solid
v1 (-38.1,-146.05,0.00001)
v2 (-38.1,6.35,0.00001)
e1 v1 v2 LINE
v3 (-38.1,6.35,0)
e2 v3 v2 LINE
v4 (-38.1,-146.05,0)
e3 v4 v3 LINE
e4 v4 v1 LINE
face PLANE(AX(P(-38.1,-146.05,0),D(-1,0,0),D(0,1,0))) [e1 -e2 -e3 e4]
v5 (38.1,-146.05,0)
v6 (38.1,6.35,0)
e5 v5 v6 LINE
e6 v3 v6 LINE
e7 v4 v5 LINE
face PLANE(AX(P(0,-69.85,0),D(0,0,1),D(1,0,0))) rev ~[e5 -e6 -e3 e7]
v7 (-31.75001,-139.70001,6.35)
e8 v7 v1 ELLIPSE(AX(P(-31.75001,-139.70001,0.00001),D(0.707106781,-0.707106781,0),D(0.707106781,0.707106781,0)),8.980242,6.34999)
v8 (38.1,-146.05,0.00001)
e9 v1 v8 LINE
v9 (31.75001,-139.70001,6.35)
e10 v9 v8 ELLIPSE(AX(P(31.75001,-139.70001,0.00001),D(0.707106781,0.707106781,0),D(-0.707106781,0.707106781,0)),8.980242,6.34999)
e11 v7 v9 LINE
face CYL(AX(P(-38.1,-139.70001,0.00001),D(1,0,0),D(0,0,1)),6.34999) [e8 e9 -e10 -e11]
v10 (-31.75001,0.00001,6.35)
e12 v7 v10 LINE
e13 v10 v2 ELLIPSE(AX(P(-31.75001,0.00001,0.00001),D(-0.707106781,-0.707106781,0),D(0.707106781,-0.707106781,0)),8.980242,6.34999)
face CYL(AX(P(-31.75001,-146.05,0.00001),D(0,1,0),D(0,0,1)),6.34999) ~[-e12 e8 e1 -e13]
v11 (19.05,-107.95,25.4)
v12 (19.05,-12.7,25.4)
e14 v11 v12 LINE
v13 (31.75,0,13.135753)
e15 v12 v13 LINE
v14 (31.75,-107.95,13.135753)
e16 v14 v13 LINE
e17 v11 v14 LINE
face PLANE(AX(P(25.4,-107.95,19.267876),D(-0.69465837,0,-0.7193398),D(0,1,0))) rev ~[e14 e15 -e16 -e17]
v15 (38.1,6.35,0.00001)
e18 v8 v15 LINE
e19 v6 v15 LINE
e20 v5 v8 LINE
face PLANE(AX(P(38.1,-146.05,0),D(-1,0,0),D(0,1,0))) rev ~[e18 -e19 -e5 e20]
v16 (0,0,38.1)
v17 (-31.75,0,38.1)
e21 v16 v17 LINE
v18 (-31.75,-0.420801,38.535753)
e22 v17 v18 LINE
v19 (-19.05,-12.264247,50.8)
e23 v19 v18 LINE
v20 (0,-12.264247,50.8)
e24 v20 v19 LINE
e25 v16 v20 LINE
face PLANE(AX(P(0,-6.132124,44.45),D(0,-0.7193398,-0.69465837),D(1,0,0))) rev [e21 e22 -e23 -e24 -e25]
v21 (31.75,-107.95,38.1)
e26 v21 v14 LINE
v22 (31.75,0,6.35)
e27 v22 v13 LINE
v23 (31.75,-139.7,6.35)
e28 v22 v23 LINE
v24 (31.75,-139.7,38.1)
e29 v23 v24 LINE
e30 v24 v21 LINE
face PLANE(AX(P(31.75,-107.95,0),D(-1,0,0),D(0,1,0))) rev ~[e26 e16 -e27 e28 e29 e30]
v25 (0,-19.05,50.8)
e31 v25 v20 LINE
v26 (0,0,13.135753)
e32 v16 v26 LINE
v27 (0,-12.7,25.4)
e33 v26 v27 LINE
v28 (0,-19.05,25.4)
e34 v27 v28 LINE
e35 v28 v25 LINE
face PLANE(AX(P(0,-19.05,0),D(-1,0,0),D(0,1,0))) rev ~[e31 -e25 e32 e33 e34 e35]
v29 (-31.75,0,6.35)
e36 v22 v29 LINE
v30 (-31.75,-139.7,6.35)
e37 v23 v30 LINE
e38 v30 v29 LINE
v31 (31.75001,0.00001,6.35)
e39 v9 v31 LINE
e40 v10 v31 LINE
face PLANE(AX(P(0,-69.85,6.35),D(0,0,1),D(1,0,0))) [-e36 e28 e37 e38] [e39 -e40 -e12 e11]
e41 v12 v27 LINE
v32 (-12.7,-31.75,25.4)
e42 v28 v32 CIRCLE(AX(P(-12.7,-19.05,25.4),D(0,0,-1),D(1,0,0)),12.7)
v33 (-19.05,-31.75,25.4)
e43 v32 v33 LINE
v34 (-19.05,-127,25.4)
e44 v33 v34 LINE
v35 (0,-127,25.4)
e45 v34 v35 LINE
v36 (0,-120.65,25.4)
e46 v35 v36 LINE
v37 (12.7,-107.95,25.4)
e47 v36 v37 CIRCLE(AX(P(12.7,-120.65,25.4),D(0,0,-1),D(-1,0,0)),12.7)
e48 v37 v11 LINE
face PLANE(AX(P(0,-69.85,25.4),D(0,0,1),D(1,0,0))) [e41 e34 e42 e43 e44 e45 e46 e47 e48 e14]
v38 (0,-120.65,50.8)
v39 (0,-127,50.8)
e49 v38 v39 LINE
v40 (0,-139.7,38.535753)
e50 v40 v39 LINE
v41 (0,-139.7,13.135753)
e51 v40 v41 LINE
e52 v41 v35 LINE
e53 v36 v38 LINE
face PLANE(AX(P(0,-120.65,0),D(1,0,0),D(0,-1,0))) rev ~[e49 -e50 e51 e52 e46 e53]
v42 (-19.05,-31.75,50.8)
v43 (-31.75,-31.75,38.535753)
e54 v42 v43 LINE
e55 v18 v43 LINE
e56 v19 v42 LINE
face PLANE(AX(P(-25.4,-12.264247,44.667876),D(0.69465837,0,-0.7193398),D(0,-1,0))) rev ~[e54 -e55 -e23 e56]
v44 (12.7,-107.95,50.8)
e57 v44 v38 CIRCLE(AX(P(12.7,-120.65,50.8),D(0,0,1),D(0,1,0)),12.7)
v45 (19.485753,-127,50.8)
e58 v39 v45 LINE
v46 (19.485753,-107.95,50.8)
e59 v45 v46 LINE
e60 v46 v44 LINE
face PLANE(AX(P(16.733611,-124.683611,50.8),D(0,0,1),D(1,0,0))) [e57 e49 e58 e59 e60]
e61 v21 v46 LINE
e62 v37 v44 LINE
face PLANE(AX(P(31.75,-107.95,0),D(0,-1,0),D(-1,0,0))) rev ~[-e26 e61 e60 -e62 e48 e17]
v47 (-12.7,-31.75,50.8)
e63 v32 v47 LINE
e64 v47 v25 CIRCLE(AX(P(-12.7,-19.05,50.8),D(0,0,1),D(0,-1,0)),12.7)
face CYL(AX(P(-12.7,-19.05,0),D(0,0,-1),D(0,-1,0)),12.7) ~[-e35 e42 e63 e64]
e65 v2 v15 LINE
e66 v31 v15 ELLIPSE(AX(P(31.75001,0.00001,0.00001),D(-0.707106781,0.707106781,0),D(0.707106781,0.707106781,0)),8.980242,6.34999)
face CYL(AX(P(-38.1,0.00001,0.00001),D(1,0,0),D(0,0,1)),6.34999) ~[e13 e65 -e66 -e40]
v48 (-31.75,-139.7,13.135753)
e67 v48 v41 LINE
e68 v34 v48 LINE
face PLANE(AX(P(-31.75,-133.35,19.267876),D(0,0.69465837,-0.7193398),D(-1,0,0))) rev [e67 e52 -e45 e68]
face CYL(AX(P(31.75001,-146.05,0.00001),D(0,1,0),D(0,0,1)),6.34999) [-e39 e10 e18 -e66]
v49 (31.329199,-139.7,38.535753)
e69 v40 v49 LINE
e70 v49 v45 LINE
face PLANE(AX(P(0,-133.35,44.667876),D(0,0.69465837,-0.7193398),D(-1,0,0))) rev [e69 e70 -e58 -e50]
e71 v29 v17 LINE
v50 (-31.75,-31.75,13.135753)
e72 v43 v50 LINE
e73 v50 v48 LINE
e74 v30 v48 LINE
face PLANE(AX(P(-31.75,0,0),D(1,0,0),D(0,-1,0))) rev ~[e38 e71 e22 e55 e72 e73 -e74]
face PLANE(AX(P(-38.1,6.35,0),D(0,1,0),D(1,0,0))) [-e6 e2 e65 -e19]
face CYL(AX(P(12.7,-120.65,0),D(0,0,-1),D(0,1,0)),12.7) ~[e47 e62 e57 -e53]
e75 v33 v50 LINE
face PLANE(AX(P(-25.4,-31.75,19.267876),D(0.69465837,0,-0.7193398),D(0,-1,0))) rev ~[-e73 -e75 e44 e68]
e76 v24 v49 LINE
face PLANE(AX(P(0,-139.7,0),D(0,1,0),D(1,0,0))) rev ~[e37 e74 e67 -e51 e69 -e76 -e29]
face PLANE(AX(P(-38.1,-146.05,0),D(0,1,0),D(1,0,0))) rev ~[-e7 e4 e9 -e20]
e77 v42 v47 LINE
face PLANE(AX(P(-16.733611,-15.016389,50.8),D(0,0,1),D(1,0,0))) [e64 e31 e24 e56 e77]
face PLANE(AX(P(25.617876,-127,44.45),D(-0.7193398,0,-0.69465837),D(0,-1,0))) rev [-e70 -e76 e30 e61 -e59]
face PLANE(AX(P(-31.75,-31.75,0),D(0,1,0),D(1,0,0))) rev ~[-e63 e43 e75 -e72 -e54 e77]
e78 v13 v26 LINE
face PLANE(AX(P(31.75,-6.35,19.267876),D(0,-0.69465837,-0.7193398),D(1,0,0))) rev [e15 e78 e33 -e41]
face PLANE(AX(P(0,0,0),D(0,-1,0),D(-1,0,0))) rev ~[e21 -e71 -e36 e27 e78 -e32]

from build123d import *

# Parameters (mm, degrees)
F0_W        = 76.2
F0_H        = 152.4
F1_DEPTH    = 6.35
F2_DEPTH    = 25.4
F3_DEPTH    = 50.8
F4_C1_SIZE2 = 12.7
F4_C1_SIZE  = 12.26424744
F4_C2_SIZE2 = 12.7
F4_C2_SIZE  = 12.26424744
F4_C3_SIZE2 = 12.26424744
F4_C3_SIZE  = 12.7
F4_C4_SIZE2 = 12.7
F4_C4_SIZE  = 12.26424744
F4_C5_SIZE2 = 12.26424744
F4_C5_SIZE  = 12.7
F4_C6_SIZE2 = 12.26424744
F4_C6_SIZE  = 12.7
F4_C7_SIZE2 = 12.26424744
F4_C7_SIZE  = 12.7
F4_C8_SIZE2 = 12.26424744
F4_C8_SIZE  = 12.7
F5_R        = 6.34999


# Not quite as in the source:
# - a fillet or chamfer is up to 0.001 mm smaller than in the source, because OpenCascade refuses the exact size


with BuildPart() as f1:
    # F0 (on Top) → F1 (new body)
    with BuildSketch(Plane.XY):
        with Locations((0, -69.85)):
            Rectangle(F0_W, F0_H)
        Polygon((-31.75, -31.75), (-31.75, 0), (0, 0), (31.75, 0), (31.75, -107.95), (31.75, -139.7), (0, -139.7), (-31.75, -139.7), align=None, mode=Mode.SUBTRACT)
    extrude(amount=F1_DEPTH)

    # F0 (on Top) → F2 (join)
    with BuildSketch(Plane.XY):
        with BuildLine():
            Line((31.75, 0), (0, 0))
            Line((0, 0), (0, -19.05))
            ThreePointArc((0, -19.05), (-3.7197438789, -28.0302561211), (-12.7, -31.75))
            Line((-12.7, -31.75), (-31.75, -31.75))
            Line((-31.75, -31.75), (-31.75, -139.7))
            Line((-31.75, -139.7), (0, -139.7))
            Line((0, -139.7), (0, -120.65))
            ThreePointArc((0, -120.65), (3.7197438789, -111.6697438789), (12.7, -107.95))
            Line((12.7, -107.95), (31.75, -107.95))
            Line((31.75, -107.95), (31.75, 0))
        make_face()
    extrude(amount=F2_DEPTH)

    # F0 (on Top) → F3 (join)
    with BuildSketch(Plane.XY):
        with BuildLine():
            Line((0, 0), (-31.75, 0))
            Line((-31.75, 0), (-31.75, -31.75))
            Line((-31.75, -31.75), (-12.7, -31.75))
            ThreePointArc((-12.7, -31.75), (-3.7197438789, -28.0302561211), (0, -19.05))
            Line((0, -19.05), (0, 0))
        make_face()
        with BuildLine():
            Line((31.75, -139.7), (31.75, -107.95))
            Line((31.75, -107.95), (12.7, -107.95))
            ThreePointArc((12.7, -107.95), (3.7197438789, -111.6697438789), (0, -120.65))
            Line((0, -120.65), (0, -139.7))
            Line((0, -139.7), (31.75, -139.7))
        make_face()
    extrude(amount=F3_DEPTH)

    # F4: chamfer of 12.7 x 12.26424744 on 8 edges, made by hand

    # F4_c1
    f4_c1_edges = [f1.edges().sort_by_distance(p)[0] for p in [
        (-15.875, -139.7, 25.4),
    ]]
    f4_c1_side = f1.faces().sort_by_distance((-15.875, -139.7, 25.1547150512))[0]
    chamfer(f4_c1_edges, length=F4_C1_SIZE, length2=F4_C1_SIZE2, reference=f4_c1_side)

    # F4_c2
    f4_c2_edges = [f1.edges().sort_by_distance(p)[0] for p in [
        (15.875, -139.7, 50.8),
    ]]
    f4_c2_side = f1.faces().sort_by_distance((15.875, -139.7, 50.5547150512))[0]
    chamfer(f4_c2_edges, length=F4_C2_SIZE, length2=F4_C2_SIZE2, reference=f4_c2_side)

    # F4_c3
    f4_c3_edges = [f1.edges().sort_by_distance(p)[0] for p in [
        (31.75, -117.475, 50.8),
    ]]
    f4_c3_side = f1.faces().sort_by_distance((31.75, -117.475, 50.5547150512))[0]
    chamfer(f4_c3_edges, length=F4_C3_SIZE, length2=F4_C3_SIZE2, reference=f4_c3_side)

    # F4_c4
    f4_c4_edges = [f1.edges().sort_by_distance(p)[0] for p in [
        (15.875, 0, 25.4),
    ]]
    f4_c4_side = f1.faces().sort_by_distance((15.875, 0, 25.1547150512))[0]
    chamfer(f4_c4_edges, length=F4_C4_SIZE, length2=F4_C4_SIZE2, reference=f4_c4_side)

    # F4_c5
    f4_c5_edges = [f1.edges().sort_by_distance(p)[0] for p in [
        (-31.75, -79.375, 25.4),
    ]]
    f4_c5_side = f1.faces().sort_by_distance((-31.5047150512, -79.375, 25.4))[0]
    chamfer(f4_c5_edges, length=F4_C5_SIZE, length2=F4_C5_SIZE2, reference=f4_c5_side)

    # F4_c6
    f4_c6_edges = [f1.edges().sort_by_distance(p)[0] for p in [
        (31.75, -60.325, 25.4),
    ]]
    f4_c6_side = f1.faces().sort_by_distance((31.5047150512, -60.325, 25.4))[0]
    chamfer(f4_c6_edges, length=F4_C6_SIZE, length2=F4_C6_SIZE2, reference=f4_c6_side)

    # F4_c7
    f4_c7_edges = [f1.edges().sort_by_distance(p)[0] for p in [
        (-15.875, 0, 50.8),
    ]]
    f4_c7_side = f1.faces().sort_by_distance((-15.875, 0, 50.5547150512))[0]
    chamfer(f4_c7_edges, length=F4_C7_SIZE, length2=F4_C7_SIZE2, reference=f4_c7_side)

    # F4_c8
    f4_c8_edges = [f1.edges().sort_by_distance(p)[0] for p in [
        (-31.75, -22.00712372, 50.8),
    ]]
    f4_c8_side = f1.faces().sort_by_distance((-31.5047150512, -22.00712372, 50.8))[0]
    chamfer(f4_c8_edges, length=F4_C8_SIZE, length2=F4_C8_SIZE2, reference=f4_c8_side)

    # F5 (radius 6.35 in the source; OpenCascade refuses exactly that, so slightly less here)
    f5_edges = [f1.edges().sort_by_distance(p)[0] for p in [
        (38.1, -69.85, 6.35),
        (0, 6.35, 6.35),
        (-38.1, -69.85, 6.35),
        (0, -146.05, 6.35),
    ]]
    fillet(f5_edges, radius=F5_R)


solid = f1.part
